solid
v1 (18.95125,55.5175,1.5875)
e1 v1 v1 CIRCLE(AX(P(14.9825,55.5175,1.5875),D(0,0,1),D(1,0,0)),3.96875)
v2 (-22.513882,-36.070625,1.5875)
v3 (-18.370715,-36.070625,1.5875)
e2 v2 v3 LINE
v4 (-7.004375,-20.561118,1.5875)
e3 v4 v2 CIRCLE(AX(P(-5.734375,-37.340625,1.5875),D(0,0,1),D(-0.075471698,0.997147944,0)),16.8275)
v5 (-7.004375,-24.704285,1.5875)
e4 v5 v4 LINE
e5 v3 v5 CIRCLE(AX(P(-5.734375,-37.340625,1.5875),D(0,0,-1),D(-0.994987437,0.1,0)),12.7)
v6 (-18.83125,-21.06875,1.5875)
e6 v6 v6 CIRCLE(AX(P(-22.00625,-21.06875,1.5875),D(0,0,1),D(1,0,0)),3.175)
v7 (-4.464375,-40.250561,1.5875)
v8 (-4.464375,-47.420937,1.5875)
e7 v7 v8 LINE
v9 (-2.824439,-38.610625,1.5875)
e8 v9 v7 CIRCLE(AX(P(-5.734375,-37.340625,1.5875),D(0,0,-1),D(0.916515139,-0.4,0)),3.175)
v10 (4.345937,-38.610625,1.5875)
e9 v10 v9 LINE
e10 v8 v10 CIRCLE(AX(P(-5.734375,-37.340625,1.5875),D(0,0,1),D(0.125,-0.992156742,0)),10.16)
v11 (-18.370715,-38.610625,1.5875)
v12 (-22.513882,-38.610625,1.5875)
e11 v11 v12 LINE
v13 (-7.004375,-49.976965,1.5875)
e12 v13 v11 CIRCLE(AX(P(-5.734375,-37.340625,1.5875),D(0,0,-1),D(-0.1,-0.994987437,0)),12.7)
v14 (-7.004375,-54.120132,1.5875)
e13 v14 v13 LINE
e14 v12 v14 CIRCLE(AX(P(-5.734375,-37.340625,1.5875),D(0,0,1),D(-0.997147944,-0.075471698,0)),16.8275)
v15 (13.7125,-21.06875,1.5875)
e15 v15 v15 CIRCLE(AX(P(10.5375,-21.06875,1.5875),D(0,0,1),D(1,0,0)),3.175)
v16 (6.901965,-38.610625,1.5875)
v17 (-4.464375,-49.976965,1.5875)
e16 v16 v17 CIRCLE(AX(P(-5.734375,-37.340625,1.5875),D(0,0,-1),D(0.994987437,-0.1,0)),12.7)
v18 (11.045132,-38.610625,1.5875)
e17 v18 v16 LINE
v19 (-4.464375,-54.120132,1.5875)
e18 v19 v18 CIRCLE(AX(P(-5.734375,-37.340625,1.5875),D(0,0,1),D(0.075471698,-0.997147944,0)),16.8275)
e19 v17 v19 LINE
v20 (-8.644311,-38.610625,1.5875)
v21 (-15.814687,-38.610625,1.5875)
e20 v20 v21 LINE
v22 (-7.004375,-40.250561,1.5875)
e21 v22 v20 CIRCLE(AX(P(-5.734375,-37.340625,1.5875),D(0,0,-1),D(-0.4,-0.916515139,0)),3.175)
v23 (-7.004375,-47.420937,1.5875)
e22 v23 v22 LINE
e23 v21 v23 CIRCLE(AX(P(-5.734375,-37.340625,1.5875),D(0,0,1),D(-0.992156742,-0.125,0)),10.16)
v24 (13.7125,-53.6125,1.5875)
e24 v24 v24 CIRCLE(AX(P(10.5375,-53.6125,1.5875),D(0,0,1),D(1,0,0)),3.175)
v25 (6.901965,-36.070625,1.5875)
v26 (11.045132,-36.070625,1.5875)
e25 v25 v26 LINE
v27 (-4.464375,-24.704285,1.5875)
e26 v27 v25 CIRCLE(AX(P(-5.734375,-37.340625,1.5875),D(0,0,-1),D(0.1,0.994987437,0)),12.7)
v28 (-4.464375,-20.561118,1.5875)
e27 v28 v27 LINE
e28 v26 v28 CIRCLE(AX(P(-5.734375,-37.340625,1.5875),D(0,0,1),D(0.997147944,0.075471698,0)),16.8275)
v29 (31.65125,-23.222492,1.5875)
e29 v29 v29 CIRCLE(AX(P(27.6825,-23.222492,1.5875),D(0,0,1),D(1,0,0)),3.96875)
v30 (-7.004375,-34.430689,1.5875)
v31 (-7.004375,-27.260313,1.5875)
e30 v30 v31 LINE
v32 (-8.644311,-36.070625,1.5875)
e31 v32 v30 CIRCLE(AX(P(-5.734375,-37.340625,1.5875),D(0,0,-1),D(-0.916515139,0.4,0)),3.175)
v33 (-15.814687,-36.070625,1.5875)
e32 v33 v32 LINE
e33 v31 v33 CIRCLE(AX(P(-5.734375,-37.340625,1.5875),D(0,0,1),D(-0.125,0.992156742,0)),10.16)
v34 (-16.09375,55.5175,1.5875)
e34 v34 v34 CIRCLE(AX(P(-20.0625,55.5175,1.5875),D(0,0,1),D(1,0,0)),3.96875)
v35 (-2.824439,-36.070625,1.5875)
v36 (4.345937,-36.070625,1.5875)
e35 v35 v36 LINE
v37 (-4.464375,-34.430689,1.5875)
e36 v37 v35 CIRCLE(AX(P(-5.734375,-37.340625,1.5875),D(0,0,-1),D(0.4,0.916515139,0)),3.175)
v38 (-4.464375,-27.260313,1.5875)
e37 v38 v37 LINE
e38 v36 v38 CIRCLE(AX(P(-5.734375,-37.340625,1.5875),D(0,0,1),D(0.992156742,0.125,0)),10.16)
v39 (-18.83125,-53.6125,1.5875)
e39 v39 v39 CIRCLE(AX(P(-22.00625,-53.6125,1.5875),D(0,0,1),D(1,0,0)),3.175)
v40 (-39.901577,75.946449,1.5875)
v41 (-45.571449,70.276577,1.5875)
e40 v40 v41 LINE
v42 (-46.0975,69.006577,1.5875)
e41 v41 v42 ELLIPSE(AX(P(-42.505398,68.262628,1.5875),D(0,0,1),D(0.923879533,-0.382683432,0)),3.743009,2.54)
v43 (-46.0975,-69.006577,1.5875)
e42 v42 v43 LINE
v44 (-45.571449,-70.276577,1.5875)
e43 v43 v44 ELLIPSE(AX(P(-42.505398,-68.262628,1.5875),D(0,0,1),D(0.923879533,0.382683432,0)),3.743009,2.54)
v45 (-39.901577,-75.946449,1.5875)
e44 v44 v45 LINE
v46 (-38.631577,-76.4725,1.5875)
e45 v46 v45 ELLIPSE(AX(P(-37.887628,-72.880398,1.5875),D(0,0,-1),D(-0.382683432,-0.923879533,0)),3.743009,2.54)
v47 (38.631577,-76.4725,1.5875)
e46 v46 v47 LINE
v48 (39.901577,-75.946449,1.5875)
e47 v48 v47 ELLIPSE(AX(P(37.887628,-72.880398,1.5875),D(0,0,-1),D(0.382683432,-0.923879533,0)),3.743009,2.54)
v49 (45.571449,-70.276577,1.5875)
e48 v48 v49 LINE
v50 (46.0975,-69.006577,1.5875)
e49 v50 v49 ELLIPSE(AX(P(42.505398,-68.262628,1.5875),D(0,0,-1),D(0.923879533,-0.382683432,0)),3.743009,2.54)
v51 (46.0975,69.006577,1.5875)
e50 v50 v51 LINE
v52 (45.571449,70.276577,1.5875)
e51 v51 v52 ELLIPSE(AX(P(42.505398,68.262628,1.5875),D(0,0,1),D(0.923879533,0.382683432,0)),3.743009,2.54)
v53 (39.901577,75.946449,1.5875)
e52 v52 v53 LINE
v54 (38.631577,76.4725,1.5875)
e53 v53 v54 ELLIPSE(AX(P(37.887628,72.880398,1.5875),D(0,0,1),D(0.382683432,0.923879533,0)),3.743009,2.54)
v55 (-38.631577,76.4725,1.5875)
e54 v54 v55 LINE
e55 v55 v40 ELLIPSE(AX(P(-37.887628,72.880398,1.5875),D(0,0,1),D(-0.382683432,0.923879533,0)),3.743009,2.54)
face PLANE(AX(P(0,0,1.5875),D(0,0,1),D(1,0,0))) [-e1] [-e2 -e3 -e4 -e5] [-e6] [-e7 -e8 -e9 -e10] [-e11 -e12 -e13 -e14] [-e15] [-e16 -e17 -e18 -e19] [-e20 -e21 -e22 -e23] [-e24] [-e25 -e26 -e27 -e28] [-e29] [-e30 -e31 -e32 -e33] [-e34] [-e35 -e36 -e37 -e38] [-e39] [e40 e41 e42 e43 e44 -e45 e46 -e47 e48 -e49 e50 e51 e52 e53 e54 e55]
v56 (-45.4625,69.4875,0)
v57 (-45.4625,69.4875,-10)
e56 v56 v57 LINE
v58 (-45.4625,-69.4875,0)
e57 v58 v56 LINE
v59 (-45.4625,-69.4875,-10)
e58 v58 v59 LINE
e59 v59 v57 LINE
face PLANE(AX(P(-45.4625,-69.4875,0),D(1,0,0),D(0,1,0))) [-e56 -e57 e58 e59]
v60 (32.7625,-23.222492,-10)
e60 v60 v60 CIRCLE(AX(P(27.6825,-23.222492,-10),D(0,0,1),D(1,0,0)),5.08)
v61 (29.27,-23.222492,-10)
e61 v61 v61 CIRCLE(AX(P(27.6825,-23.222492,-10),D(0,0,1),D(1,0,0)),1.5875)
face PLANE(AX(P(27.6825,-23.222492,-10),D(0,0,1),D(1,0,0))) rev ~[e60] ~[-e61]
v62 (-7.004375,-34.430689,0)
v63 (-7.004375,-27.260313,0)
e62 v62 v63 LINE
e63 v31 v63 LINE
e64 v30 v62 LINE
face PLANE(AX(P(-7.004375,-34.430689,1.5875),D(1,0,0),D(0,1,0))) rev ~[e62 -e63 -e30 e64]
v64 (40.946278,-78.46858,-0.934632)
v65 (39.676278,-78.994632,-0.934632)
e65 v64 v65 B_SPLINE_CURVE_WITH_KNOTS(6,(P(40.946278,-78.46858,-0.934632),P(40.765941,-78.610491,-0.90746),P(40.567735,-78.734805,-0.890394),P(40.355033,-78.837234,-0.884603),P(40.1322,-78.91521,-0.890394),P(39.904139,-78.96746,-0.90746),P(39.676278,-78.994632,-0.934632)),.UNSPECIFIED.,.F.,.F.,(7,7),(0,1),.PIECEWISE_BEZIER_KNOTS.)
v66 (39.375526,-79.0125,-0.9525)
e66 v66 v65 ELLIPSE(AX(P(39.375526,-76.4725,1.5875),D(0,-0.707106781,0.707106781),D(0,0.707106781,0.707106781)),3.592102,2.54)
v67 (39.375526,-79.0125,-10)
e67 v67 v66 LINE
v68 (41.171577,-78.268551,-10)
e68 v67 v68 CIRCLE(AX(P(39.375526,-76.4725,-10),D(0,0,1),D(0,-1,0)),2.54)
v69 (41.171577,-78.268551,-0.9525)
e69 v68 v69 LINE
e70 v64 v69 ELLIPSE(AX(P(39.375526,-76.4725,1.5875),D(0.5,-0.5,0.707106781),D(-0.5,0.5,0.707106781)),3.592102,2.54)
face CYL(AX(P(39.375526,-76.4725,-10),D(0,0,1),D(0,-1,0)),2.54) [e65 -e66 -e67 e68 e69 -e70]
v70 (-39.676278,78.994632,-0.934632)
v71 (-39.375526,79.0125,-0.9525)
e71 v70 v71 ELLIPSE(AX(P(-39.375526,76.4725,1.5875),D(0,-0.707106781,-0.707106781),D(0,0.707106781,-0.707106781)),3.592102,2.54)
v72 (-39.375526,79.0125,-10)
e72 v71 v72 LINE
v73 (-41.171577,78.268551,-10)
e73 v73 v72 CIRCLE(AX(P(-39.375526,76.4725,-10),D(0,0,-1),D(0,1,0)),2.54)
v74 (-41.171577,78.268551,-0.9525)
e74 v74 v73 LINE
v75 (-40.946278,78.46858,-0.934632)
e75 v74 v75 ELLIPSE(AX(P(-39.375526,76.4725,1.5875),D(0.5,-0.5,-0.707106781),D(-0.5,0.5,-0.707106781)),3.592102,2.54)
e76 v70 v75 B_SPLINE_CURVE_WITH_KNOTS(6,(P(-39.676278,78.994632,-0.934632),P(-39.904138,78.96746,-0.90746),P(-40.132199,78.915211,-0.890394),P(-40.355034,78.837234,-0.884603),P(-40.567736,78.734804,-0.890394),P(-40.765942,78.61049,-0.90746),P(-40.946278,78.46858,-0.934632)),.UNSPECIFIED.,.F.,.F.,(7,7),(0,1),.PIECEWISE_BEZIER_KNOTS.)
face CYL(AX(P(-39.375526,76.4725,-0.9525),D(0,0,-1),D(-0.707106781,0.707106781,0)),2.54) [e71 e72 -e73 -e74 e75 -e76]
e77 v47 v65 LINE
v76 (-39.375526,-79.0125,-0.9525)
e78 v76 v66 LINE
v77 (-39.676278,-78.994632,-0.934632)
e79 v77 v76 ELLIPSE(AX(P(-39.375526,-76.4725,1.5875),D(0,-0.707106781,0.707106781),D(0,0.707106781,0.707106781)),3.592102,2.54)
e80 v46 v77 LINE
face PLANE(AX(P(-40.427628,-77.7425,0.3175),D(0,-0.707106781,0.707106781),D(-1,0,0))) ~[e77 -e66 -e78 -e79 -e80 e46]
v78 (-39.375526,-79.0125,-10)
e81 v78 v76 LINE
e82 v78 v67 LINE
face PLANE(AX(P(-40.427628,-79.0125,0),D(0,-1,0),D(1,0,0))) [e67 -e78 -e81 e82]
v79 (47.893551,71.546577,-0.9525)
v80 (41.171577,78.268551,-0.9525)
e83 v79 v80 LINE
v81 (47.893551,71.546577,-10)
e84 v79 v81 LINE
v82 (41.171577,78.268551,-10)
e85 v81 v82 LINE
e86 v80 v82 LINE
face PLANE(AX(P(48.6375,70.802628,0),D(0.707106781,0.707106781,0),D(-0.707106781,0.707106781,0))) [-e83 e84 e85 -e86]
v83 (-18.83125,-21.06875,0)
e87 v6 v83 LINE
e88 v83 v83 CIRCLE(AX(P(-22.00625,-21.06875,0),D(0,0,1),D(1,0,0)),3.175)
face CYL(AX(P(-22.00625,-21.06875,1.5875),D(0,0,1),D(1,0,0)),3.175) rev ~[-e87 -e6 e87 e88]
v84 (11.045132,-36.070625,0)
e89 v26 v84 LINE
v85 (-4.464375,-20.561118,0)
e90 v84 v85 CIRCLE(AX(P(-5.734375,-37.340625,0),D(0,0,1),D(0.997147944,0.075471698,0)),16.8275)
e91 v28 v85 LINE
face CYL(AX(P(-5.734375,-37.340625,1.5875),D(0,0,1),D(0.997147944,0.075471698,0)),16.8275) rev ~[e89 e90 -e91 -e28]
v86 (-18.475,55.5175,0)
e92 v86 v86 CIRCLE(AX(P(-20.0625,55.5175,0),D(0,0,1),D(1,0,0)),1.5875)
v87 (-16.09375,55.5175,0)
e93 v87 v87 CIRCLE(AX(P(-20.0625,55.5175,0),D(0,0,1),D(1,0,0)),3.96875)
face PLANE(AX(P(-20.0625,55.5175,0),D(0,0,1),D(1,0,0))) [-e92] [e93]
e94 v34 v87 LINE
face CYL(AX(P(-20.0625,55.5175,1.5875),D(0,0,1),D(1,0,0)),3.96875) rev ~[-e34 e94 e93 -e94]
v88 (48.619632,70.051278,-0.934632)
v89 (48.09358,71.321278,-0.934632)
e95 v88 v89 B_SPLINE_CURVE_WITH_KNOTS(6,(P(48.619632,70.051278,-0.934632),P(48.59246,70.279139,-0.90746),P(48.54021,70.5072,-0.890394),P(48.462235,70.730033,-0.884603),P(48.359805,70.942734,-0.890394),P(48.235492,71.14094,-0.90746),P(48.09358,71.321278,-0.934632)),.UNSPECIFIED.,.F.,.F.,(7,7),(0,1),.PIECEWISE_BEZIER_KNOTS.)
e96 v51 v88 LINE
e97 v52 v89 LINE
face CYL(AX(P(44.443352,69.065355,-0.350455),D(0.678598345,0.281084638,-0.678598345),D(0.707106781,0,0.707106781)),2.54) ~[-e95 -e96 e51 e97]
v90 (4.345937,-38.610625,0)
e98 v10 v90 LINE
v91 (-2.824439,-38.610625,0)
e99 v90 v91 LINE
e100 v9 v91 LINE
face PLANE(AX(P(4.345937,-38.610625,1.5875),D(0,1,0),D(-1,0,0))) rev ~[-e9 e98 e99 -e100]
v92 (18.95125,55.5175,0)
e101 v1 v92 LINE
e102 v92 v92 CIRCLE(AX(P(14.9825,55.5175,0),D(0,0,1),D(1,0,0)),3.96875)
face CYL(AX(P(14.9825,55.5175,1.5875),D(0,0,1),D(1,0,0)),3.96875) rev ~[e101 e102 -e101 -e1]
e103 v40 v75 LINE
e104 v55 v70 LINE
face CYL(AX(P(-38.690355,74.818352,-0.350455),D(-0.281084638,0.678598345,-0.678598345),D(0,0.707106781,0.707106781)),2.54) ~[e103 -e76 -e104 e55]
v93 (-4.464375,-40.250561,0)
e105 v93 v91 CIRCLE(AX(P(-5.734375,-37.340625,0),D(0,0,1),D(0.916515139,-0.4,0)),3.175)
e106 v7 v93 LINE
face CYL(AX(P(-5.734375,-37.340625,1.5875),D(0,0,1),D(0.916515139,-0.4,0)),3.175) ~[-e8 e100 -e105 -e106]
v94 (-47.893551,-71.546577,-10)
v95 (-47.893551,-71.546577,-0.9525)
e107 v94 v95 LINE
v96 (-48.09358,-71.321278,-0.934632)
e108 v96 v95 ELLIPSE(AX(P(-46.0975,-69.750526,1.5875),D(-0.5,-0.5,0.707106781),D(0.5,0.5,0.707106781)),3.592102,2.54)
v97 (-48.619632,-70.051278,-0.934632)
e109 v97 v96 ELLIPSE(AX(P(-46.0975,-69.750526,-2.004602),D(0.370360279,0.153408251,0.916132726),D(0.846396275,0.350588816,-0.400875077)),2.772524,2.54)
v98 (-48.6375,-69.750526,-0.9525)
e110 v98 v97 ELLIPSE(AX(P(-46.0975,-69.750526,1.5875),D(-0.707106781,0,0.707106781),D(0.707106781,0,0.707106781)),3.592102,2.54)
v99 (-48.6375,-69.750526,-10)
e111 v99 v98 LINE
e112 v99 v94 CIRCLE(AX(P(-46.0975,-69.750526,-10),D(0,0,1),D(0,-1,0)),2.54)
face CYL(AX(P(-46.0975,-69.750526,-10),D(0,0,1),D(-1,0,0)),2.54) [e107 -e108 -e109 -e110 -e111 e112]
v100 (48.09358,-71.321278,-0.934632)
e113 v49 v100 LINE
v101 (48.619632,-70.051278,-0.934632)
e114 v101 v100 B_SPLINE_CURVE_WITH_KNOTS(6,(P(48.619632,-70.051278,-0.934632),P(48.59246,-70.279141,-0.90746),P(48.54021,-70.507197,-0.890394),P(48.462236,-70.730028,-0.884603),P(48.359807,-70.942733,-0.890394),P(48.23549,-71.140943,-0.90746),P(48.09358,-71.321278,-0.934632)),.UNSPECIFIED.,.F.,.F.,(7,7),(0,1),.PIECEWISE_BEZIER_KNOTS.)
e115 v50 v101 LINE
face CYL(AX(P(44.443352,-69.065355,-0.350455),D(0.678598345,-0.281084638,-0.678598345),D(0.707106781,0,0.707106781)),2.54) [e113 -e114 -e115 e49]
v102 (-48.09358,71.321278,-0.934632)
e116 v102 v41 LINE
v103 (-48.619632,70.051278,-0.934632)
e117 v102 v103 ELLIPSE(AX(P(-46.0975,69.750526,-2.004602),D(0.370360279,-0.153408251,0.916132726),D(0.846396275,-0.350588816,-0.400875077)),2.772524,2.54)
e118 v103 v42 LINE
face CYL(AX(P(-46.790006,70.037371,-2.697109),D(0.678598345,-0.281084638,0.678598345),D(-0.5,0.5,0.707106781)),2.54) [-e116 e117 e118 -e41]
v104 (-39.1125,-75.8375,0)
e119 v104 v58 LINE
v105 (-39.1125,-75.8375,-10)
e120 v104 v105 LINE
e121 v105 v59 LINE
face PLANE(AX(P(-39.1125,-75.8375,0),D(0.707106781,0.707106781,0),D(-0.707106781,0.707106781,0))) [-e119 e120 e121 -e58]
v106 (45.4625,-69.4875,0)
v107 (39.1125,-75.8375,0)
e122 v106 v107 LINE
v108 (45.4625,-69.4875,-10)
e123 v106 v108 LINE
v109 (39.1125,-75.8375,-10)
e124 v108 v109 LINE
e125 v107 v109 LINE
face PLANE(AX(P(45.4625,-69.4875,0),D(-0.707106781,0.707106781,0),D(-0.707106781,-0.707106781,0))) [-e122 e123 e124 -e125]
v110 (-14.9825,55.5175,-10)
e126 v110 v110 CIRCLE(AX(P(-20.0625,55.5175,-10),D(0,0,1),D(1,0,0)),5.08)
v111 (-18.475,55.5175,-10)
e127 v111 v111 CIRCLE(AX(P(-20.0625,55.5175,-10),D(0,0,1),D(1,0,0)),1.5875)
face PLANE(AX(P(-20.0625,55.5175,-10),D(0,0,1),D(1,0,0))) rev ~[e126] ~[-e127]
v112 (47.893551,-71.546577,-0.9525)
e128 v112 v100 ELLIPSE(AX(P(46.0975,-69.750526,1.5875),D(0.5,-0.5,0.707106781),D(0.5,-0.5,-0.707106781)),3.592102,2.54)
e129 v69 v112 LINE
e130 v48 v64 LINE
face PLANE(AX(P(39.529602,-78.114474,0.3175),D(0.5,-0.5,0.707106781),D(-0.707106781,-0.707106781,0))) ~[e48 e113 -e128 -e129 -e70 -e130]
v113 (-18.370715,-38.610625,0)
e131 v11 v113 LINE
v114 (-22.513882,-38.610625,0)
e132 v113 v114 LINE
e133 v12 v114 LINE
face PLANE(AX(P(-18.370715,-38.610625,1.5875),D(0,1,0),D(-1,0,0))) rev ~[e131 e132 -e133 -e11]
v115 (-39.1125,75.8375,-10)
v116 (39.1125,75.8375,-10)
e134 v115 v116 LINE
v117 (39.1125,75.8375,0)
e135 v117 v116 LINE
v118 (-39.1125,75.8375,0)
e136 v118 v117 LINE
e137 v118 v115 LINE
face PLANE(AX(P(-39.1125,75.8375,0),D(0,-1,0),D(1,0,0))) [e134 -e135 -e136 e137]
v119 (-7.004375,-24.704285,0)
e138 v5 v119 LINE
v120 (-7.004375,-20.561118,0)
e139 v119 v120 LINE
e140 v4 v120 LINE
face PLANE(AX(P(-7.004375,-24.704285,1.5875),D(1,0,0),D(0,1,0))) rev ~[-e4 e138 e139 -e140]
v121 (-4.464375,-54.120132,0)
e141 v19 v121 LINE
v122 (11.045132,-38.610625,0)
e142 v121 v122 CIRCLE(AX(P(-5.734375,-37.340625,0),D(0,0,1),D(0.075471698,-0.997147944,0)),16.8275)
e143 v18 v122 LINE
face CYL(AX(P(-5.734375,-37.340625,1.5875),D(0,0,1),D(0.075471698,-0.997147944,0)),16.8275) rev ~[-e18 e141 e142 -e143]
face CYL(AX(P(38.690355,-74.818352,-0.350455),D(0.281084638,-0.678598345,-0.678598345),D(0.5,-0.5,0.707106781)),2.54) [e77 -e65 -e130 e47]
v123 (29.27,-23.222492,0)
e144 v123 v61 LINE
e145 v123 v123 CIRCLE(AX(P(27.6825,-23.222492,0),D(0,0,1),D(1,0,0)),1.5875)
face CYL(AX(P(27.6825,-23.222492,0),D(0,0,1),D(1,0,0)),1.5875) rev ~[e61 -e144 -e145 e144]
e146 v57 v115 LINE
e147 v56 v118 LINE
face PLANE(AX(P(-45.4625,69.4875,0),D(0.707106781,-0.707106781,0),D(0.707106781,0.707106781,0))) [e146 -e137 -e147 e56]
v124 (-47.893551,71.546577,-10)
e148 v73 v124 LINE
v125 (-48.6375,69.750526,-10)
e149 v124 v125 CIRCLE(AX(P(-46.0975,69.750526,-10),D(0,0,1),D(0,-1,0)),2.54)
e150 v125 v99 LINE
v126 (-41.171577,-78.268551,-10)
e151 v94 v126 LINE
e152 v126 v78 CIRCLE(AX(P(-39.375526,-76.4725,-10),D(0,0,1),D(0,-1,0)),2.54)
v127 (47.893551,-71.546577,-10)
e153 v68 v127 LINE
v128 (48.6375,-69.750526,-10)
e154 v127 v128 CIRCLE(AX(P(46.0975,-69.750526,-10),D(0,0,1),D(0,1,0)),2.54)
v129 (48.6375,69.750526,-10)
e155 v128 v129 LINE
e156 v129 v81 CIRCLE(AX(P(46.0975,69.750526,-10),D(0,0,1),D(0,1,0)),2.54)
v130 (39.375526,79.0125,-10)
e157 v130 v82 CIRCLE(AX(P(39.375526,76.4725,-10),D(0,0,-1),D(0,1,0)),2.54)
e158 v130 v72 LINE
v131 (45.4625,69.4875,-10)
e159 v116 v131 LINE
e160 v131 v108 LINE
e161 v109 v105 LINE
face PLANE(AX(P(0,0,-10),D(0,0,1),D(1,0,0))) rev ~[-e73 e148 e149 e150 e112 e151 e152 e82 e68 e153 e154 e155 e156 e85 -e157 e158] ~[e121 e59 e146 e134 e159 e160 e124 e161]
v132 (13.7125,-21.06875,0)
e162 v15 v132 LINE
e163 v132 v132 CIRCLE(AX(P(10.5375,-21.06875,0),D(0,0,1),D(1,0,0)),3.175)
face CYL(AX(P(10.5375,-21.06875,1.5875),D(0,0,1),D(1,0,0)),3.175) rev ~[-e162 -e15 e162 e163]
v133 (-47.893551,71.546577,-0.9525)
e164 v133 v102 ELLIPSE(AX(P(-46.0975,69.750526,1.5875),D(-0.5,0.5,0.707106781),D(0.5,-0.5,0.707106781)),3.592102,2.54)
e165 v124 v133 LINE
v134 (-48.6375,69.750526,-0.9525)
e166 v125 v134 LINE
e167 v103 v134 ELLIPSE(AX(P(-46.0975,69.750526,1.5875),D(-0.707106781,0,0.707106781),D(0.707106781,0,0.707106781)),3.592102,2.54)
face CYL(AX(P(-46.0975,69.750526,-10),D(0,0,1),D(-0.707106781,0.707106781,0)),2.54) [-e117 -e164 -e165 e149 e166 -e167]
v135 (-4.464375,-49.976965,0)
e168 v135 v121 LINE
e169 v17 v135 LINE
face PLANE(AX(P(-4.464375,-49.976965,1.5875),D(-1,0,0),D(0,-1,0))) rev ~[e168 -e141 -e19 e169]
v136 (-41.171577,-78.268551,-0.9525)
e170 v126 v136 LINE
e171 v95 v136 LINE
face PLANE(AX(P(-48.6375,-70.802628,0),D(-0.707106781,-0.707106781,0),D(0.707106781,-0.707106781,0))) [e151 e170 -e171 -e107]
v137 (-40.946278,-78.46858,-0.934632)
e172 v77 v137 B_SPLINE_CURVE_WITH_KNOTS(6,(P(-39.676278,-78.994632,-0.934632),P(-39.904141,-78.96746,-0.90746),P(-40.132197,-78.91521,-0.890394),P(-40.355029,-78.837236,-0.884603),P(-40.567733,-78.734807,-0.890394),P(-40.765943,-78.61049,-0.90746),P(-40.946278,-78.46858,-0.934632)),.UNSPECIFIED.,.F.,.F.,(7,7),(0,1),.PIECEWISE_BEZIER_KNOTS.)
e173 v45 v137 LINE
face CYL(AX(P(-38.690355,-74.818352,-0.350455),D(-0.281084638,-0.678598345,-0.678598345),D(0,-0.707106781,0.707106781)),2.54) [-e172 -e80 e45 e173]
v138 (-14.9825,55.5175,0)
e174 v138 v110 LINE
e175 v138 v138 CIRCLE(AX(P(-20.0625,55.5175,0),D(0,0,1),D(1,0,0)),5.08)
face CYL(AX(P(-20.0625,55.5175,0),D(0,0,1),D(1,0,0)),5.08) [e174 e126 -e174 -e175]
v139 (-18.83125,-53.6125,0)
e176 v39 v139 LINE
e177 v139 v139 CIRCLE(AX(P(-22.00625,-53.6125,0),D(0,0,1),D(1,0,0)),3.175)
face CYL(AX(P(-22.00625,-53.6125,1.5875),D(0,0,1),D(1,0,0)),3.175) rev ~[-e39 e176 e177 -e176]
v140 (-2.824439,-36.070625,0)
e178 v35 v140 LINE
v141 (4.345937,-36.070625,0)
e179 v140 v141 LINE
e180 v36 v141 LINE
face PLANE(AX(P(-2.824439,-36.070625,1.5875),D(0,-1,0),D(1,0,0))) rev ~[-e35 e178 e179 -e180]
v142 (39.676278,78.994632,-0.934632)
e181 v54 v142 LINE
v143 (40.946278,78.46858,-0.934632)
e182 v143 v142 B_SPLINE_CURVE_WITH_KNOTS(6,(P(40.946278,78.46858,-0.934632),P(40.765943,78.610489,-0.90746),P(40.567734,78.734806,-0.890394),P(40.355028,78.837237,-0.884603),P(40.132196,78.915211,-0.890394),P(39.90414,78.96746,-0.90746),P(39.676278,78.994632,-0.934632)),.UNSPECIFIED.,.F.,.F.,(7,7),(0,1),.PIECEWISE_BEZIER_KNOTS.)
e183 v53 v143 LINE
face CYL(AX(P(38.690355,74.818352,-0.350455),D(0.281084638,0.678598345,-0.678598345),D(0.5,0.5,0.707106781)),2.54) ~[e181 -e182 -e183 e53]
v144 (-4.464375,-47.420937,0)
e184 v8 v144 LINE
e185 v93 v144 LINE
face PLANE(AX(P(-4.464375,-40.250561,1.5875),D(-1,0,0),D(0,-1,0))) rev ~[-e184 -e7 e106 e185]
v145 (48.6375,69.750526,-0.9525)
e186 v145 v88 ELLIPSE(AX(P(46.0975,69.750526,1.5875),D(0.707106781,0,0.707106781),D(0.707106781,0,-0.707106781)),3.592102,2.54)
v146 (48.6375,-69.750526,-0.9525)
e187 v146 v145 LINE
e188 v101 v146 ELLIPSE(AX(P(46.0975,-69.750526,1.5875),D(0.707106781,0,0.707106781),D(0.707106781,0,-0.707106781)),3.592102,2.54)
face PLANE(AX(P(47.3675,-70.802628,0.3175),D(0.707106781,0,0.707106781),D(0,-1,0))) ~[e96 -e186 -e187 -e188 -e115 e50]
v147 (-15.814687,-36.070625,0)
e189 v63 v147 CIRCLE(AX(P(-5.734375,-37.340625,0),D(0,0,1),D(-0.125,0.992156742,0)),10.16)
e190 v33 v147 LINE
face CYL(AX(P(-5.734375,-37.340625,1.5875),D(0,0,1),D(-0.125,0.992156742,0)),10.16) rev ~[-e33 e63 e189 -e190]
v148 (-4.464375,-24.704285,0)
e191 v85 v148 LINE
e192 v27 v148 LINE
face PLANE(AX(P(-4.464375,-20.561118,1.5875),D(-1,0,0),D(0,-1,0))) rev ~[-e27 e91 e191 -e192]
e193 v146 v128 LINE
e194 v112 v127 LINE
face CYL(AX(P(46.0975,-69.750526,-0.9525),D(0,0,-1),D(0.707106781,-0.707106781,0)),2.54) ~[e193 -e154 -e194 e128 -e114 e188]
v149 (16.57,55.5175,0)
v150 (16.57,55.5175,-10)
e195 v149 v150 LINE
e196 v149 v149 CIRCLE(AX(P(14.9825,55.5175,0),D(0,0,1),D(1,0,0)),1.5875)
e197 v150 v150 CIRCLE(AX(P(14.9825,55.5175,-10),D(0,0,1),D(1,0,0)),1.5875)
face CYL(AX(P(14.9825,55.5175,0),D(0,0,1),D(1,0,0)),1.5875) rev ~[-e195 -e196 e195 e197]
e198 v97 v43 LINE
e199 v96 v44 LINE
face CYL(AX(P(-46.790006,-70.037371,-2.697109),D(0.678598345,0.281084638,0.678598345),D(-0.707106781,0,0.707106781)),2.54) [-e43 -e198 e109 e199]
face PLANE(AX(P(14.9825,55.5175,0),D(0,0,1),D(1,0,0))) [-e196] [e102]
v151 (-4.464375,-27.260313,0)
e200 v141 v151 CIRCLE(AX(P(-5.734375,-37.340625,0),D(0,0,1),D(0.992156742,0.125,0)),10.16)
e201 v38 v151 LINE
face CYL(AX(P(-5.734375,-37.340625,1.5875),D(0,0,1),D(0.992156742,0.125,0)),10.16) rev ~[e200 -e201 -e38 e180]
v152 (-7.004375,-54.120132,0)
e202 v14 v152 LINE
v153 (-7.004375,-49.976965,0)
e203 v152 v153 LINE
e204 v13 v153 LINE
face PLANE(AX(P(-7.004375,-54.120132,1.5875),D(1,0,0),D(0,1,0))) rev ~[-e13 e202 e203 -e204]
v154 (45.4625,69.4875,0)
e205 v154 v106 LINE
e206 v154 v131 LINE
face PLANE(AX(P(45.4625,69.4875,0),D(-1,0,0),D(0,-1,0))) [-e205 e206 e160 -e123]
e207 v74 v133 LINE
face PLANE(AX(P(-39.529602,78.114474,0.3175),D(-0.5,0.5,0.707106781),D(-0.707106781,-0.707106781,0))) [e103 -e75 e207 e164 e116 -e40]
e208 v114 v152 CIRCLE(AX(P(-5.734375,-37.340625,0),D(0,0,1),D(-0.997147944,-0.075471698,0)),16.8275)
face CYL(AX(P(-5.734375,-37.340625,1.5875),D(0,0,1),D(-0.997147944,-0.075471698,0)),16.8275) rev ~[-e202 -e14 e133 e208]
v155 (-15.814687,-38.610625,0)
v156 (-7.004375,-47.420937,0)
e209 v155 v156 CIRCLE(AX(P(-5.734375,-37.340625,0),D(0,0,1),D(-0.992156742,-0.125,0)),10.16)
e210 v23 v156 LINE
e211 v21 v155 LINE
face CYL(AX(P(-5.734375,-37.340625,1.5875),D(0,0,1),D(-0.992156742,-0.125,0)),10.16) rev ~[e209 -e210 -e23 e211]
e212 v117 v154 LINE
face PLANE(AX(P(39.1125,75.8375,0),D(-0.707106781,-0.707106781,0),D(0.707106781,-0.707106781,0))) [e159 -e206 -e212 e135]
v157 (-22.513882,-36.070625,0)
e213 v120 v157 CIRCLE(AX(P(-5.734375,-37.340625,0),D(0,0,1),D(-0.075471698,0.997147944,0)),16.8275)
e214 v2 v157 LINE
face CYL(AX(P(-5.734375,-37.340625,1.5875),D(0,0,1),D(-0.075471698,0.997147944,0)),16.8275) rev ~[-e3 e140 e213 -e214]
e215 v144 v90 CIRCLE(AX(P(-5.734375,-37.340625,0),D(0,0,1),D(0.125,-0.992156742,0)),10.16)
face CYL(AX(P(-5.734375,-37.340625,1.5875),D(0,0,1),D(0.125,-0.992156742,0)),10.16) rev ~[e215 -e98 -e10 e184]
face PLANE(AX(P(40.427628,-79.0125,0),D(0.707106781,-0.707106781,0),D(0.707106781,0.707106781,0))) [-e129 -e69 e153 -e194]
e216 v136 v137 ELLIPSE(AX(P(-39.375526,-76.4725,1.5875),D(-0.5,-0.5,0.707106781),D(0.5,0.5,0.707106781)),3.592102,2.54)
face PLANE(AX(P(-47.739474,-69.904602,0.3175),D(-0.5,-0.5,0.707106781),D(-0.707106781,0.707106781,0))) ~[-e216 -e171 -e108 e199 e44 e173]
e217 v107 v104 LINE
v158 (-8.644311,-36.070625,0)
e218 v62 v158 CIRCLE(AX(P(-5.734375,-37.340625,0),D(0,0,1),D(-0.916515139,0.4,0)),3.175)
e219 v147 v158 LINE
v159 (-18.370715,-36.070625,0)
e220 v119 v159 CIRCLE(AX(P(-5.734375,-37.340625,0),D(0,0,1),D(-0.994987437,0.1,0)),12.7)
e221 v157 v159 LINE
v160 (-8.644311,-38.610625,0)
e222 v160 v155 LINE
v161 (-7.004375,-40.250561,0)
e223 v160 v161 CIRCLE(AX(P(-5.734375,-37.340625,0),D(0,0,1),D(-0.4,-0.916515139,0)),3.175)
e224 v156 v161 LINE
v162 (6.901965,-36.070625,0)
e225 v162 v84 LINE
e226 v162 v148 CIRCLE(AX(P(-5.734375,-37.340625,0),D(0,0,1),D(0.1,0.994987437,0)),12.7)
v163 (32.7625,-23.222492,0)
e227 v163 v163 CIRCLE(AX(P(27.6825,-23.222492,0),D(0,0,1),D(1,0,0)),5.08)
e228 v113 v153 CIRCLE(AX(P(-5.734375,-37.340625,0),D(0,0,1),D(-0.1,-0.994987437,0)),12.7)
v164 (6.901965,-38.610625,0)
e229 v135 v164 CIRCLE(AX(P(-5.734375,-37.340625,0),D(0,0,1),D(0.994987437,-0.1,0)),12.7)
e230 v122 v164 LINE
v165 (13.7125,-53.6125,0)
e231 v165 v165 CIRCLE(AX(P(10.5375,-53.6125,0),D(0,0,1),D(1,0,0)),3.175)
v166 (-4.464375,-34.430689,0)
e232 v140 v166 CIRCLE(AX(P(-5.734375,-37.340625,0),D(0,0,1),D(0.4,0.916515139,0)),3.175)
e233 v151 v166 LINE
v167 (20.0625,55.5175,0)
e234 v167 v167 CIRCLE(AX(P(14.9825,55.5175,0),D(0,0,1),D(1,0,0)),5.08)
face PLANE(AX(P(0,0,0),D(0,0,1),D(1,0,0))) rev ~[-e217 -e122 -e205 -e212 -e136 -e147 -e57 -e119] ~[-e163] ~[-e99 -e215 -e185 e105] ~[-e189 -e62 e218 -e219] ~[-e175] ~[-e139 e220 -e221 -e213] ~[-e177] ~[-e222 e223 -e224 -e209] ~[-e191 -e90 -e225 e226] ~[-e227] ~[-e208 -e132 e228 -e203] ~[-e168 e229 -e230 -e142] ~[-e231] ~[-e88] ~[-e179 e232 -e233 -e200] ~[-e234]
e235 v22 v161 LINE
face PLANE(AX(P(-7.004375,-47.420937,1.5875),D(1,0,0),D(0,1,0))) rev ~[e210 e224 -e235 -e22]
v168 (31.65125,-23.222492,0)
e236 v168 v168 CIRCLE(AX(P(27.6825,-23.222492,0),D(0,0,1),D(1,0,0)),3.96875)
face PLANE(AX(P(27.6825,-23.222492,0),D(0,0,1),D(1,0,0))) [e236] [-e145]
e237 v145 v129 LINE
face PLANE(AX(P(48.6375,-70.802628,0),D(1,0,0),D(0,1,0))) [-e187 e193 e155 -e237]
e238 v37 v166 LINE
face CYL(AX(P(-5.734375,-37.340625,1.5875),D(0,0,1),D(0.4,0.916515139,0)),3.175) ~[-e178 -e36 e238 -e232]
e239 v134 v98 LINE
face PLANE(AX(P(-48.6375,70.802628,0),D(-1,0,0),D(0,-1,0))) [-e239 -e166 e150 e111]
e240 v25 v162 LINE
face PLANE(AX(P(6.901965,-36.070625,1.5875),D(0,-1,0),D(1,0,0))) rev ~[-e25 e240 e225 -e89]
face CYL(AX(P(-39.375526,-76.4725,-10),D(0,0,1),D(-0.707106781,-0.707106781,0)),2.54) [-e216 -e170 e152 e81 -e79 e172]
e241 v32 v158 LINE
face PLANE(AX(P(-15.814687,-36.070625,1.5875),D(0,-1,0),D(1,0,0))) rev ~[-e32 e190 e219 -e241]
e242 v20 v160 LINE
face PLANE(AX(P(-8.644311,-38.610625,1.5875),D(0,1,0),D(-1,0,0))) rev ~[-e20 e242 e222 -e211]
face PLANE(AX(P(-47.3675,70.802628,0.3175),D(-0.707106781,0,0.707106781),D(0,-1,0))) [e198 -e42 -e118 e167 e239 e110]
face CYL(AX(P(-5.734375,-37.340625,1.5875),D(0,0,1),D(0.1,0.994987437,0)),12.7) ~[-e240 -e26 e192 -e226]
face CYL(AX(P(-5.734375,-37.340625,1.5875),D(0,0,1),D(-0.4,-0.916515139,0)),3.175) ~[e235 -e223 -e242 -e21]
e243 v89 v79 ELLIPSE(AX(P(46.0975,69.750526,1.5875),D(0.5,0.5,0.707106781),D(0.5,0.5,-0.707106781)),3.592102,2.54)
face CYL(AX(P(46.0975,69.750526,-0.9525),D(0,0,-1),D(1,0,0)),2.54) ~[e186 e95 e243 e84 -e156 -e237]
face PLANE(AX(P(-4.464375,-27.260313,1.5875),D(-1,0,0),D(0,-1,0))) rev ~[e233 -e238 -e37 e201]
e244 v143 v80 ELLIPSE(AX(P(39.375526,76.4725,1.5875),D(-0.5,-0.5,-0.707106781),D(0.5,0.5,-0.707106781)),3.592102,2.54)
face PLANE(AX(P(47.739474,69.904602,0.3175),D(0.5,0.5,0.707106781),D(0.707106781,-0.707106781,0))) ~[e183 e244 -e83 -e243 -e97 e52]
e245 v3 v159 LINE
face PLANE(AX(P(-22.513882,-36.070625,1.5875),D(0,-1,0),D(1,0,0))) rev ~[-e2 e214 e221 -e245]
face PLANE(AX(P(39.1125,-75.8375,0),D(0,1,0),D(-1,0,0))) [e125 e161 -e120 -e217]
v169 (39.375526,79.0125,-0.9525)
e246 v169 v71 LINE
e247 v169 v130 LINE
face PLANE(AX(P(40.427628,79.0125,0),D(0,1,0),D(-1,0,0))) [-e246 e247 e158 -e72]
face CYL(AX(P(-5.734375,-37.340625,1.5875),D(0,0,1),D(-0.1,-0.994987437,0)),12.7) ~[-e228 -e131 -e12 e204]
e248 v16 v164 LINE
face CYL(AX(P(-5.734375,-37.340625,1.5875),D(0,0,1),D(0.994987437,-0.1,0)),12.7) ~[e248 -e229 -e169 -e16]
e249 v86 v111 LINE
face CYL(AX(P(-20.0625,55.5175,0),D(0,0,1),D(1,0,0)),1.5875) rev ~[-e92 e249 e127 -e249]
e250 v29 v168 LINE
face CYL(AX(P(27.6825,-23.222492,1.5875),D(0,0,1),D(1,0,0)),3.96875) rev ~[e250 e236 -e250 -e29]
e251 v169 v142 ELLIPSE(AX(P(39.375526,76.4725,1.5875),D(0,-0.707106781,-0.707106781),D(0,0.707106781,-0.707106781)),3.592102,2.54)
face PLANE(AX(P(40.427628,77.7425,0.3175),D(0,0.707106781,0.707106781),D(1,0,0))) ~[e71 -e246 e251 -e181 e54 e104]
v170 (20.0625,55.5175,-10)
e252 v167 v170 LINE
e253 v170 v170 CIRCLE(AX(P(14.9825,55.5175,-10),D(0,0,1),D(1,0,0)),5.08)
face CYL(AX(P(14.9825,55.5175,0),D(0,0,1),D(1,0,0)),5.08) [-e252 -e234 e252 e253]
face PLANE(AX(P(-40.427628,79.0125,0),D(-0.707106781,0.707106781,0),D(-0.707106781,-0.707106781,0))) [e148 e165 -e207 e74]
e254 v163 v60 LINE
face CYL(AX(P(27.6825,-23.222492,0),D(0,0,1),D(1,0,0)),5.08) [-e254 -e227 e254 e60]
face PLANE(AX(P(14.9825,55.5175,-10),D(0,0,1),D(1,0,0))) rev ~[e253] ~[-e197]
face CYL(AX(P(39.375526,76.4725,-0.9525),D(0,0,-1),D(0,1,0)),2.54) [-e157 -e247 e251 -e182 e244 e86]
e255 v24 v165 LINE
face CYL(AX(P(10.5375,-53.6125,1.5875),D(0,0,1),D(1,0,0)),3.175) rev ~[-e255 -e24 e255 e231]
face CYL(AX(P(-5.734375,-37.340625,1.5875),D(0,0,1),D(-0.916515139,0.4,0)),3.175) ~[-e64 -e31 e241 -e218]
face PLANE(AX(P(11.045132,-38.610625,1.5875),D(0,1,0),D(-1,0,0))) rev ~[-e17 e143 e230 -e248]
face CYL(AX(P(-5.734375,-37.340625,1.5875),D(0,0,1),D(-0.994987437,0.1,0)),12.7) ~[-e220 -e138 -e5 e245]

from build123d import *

# Parameters (mm, degrees)
F3_DEPTH  = 1.5875
F1_R      = 5.08
F1_R_2    = 1.5875
F4_DEPTH  = 10
F5_DEPTH  = 10
F6_R      = 3.96875
F7_DEPTH  = 1.5875
F8_R      = 3.175
F9_DEPTH  = 11.5885
F10_SIZE  = 2.54
F11_F1_R  = 2.54
F11_F2_R  = 2.54
F11_F3_R  = 2.54
F11_F4_R  = 2.54
F11_F5_R  = 2.54
F11_F6_R  = 2.54
F11_F7_R  = 2.54
F11_F8_R  = 2.54
F11_F9_R  = 2.54
F11_F10_R = 2.54
F11_F11_R = 2.54
F11_F12_R = 2.54
F11_F13_R = 2.54
F11_F14_R = 2.54
F11_F15_R = 2.54
F11_F16_R = 2.54


with BuildPart() as f3:
    # F0 (on Top) → F3 (new body)
    with BuildSketch(Plane.XY):
        Polygon((-40.4276280605, 79.0125), (-48.6375, 70.8026280605), (-48.6375, -70.8026280605), (-40.4276280605, -79.0125), (40.4276280605, -79.0125), (48.6375, -70.8026280605), (48.6375, 70.8026280605), (40.4276280605, 79.0125), align=None)
        Polygon((-45.4625, 69.4875), (-39.1125, 75.8375), (39.1125, 75.8375), (45.4625, 69.4875), (45.4625, -69.4875), (39.1125, -75.8375), (-39.1125, -75.8375), (-45.4625, -69.4875), align=None, mode=Mode.SUBTRACT)
        Polygon((39.1125, 75.8375), (-39.1125, 75.8375), (-45.4625, 69.4875), (-45.4625, -69.4875), (-39.1125, -75.8375), (39.1125, -75.8375), (45.4625, -69.4875), (45.4625, 69.4875), align=None)
    extrude(amount=F3_DEPTH)

    # F1 (on Top) → F4 (join)
    with BuildSketch(Plane.XY):
        with Locations((27.6825, -23.2224922)):
            Circle(F1_R)
        with Locations((27.6825, -23.2224922)):
            Circle(F1_R_2, mode=Mode.SUBTRACT)
        with Locations((14.9825, 55.5175)):
            Circle(F1_R)
        with Locations((14.9825, 55.5175)):
            Circle(F1_R_2, mode=Mode.SUBTRACT)
        with Locations((-20.0625, 55.5175)):
            Circle(F1_R)
        with Locations((-20.0625, 55.5175)):
            Circle(F1_R_2, mode=Mode.SUBTRACT)
    extrude(amount=-F4_DEPTH)

    # F0 (on Top) → F5 (join)
    with BuildSketch(Plane.XY):
        Polygon((-40.4276280605, 79.0125), (-48.6375, 70.8026280605), (-48.6375, -70.8026280605), (-40.4276280605, -79.0125), (40.4276280605, -79.0125), (48.6375, -70.8026280605), (48.6375, 70.8026280605), (40.4276280605, 79.0125), align=None)
        Polygon((-45.4625, 69.4875), (-39.1125, 75.8375), (39.1125, 75.8375), (45.4625, 69.4875), (45.4625, -69.4875), (39.1125, -75.8375), (-39.1125, -75.8375), (-45.4625, -69.4875), align=None, mode=Mode.SUBTRACT)
    extrude(amount=-F5_DEPTH)

    # F6 (on face) → F7 (cut)
    with BuildSketch(Plane.XY.offset(1.5875)):
        with Locations((-20.0625, 55.5175)):
            Circle(F6_R)
        with Locations((14.9825, 55.5175)):
            Circle(F6_R)
        with Locations((27.6825, -23.2224922)):
            Circle(F6_R)
    extrude(amount=-F7_DEPTH, mode=Mode.SUBTRACT)

    # F8 (on face) → F9 (cut, through all)
    with BuildSketch(Plane.XY.offset(1.5875)):
        with Locations((-22.00625, -21.06875)):
            Circle(F8_R)
        with Locations((10.5375, -21.06875)):
            Circle(F8_R)
        with Locations((10.5375, -53.6125)):
            Circle(F8_R)
        with Locations((-22.00625, -53.6125)):
            Circle(F8_R)
        with BuildLine():
            Line((-18.3707154513, -38.610625), (-22.5138820324, -38.610625))
            ThreePointArc((-22.5138820324, -38.610625), (-17.6332143604, -49.2394643604), (-7.004375, -54.1201320324))
            Line((-7.004375, -54.1201320324), (-7.004375, -49.9769654513))
            ThreePointArc((-7.004375, -49.9769654513), (-14.7146311211, -46.3208811211), (-18.3707154513, -38.610625))
        make_face()
        with BuildLine():
            ThreePointArc((-8.6443105663, -36.070625), (-7.9794390303, -35.0955609697), (-7.004375, -34.4306894337))
            Line((-7.004375, -34.4306894337), (-7.004375, -27.2603125048))
            ThreePointArc((-7.004375, -27.2603125048), (-12.9185798969, -30.1564201031), (-15.8146874952, -36.070625))
            Line((-15.8146874952, -36.070625), (-8.6443105663, -36.070625))
        make_face()
        with BuildLine():
            Line((-4.464375, -27.2603125048), (-4.464375, -34.4306894337))
            ThreePointArc((-4.464375, -34.4306894337), (-3.4893109697, -35.0955609697), (-2.8244394337, -36.070625))
            Line((-2.8244394337, -36.070625), (4.3459374952, -36.070625))
            ThreePointArc((4.3459374952, -36.070625), (1.4498298969, -30.1564201031), (-4.464375, -27.2603125048))
        make_face()
        with BuildLine():
            Line((4.3459374952, -38.610625), (-2.8244394337, -38.610625))
            ThreePointArc((-2.8244394337, -38.610625), (-3.4893109697, -39.5856890303), (-4.464375, -40.2505605663))
            Line((-4.464375, -40.2505605663), (-4.464375, -47.4209374952))
            ThreePointArc((-4.464375, -47.4209374952), (1.4498298969, -44.5248298969), (4.3459374952, -38.610625))
        make_face()
        with BuildLine():
            Line((-7.004375, -47.4209374952), (-7.004375, -40.2505605663))
            ThreePointArc((-7.004375, -40.2505605663), (-7.9794390303, -39.5856890303), (-8.6443105663, -38.610625))
            Line((-8.6443105663, -38.610625), (-15.8146874952, -38.610625))
            ThreePointArc((-15.8146874952, -38.610625), (-12.9185798969, -44.5248298969), (-7.004375, -47.4209374952))
        make_face()
        with BuildLine():
            Line((-22.5138820324, -36.070625), (-18.3707154513, -36.070625))
            ThreePointArc((-18.3707154513, -36.070625), (-14.7146311211, -28.3603688789), (-7.004375, -24.7042845487))
            Line((-7.004375, -24.7042845487), (-7.004375, -20.5611179676))
            ThreePointArc((-7.004375, -20.5611179676), (-17.6332143604, -25.4417856396), (-22.5138820324, -36.070625))
        make_face()
        with BuildLine():
            ThreePointArc((-4.464375, -24.7042845487), (3.2458811211, -28.3603688789), (6.9019654513, -36.070625))
            Line((6.9019654513, -36.070625), (11.0451320324, -36.070625))
            ThreePointArc((11.0451320324, -36.070625), (6.1644643604, -25.4417856396), (-4.464375, -20.5611179676))
            Line((-4.464375, -20.5611179676), (-4.464375, -24.7042845487))
        make_face()
        with BuildLine():
            Line((11.0451320324, -38.610625), (6.9019654513, -38.610625))
            ThreePointArc((6.9019654513, -38.610625), (3.2458811211, -46.3208811211), (-4.464375, -49.9769654513))
            Line((-4.464375, -49.9769654513), (-4.464375, -54.1201320324))
            ThreePointArc((-4.464375, -54.1201320324), (6.1644643604, -49.2394643604), (11.0451320324, -38.610625))
        make_face()
    extrude(amount=-F9_DEPTH, mode=Mode.SUBTRACT)

    # F10
    f10_edges = [f3.edges().sort_by_distance(p)[0] for p in [
        (0, 79.0125, 1.5875),
        (-44.532564, 74.907564, 1.5875),
        (-48.6375, 0, 1.5875),
        (44.532564, 74.907564, 1.5875),
        (48.6375, 0, 1.5875),
        (-44.532564, -74.907564, 1.5875),
        (0, -79.0125, 1.5875),
        (44.532564, -74.907564, 1.5875),
    ]]
    chamfer(f10_edges, length=F10_SIZE)

    # F11: fillet of radius 2.54 on 16 edges, made by hand

    # F11_f1
    f11_f1_edges = [f3.edges().sort_by_distance(p)[0] for p in [
        (-40.4276280605, 79.0125, -5.47625),
    ]]
    fillet(f11_f1_edges, radius=F11_F1_R)

    # F11_f2
    f11_f2_edges = [f3.edges().sort_by_distance(p)[0] for p in [
        (-48.6375, 70.8026280605, -5.47625),
    ]]
    fillet(f11_f2_edges, radius=F11_F2_R)

    # F11_f3
    f11_f3_edges = [f3.edges().sort_by_distance(p)[0] for p in [
        (40.4276280605, 79.0125, -5.47625),
    ]]
    fillet(f11_f3_edges, radius=F11_F3_R)

    # F11_f4
    f11_f4_edges = [f3.edges().sort_by_distance(p)[0] for p in [
        (-39.8615335712, 77.6458270063, 0.4141729937),
    ]]
    fillet(f11_f4_edges, radius=F11_F4_R)

    # F11_f5
    f11_f5_edges = [f3.edges().sort_by_distance(p)[0] for p in [
        (-47.2708270063, 70.2365335712, 0.4141729937),
    ]]
    fillet(f11_f5_edges, radius=F11_F5_R)

    # F11_f6
    f11_f6_edges = [f3.edges().sort_by_distance(p)[0] for p in [
        (-48.6375, -70.8026280605, -5.47625),
    ]]
    fillet(f11_f6_edges, radius=F11_F6_R)

    # F11_f7
    f11_f7_edges = [f3.edges().sort_by_distance(p)[0] for p in [
        (48.6375, 70.8026280605, -5.47625),
    ]]
    fillet(f11_f7_edges, radius=F11_F7_R)

    # F11_f8
    f11_f8_edges = [f3.edges().sort_by_distance(p)[0] for p in [
        (39.8615335712, 77.6458270063, 0.4141729937),
    ]]
    fillet(f11_f8_edges, radius=F11_F8_R)

    # F11_f9
    f11_f9_edges = [f3.edges().sort_by_distance(p)[0] for p in [
        (-47.2708270063, -70.2365335712, 0.4141729937),
    ]]
    fillet(f11_f9_edges, radius=F11_F9_R)

    # F11_f10
    f11_f10_edges = [f3.edges().sort_by_distance(p)[0] for p in [
        (-40.4276280605, -79.0125, -5.47625),
    ]]
    fillet(f11_f10_edges, radius=F11_F10_R)

    # F11_f11
    f11_f11_edges = [f3.edges().sort_by_distance(p)[0] for p in [
        (40.4276280605, -79.0125, -5.47625),
    ]]
    fillet(f11_f11_edges, radius=F11_F11_R)

    # F11_f12
    f11_f12_edges = [f3.edges().sort_by_distance(p)[0] for p in [
        (48.6375, -70.8026280605, -5.47625),
    ]]
    fillet(f11_f12_edges, radius=F11_F12_R)

    # F11_f13
    f11_f13_edges = [f3.edges().sort_by_distance(p)[0] for p in [
        (47.2708270063, 70.2365335712, 0.4141729937),
    ]]
    fillet(f11_f13_edges, radius=F11_F13_R)

    # F11_f14
    f11_f14_edges = [f3.edges().sort_by_distance(p)[0] for p in [
        (47.2708270063, -70.2365335712, 0.4141729937),
    ]]
    fillet(f11_f14_edges, radius=F11_F14_R)

    # F11_f15
    f11_f15_edges = [f3.edges().sort_by_distance(p)[0] for p in [
        (39.8615335712, -77.6458270063, 0.4141729937),
    ]]
    fillet(f11_f15_edges, radius=F11_F15_R)

    # F11_f16
    f11_f16_edges = [f3.edges().sort_by_distance(p)[0] for p in [
        (-39.8615335712, -77.6458270063, 0.4141729937),
    ]]
    fillet(f11_f16_edges, radius=F11_F16_R)


solid = f3.part
